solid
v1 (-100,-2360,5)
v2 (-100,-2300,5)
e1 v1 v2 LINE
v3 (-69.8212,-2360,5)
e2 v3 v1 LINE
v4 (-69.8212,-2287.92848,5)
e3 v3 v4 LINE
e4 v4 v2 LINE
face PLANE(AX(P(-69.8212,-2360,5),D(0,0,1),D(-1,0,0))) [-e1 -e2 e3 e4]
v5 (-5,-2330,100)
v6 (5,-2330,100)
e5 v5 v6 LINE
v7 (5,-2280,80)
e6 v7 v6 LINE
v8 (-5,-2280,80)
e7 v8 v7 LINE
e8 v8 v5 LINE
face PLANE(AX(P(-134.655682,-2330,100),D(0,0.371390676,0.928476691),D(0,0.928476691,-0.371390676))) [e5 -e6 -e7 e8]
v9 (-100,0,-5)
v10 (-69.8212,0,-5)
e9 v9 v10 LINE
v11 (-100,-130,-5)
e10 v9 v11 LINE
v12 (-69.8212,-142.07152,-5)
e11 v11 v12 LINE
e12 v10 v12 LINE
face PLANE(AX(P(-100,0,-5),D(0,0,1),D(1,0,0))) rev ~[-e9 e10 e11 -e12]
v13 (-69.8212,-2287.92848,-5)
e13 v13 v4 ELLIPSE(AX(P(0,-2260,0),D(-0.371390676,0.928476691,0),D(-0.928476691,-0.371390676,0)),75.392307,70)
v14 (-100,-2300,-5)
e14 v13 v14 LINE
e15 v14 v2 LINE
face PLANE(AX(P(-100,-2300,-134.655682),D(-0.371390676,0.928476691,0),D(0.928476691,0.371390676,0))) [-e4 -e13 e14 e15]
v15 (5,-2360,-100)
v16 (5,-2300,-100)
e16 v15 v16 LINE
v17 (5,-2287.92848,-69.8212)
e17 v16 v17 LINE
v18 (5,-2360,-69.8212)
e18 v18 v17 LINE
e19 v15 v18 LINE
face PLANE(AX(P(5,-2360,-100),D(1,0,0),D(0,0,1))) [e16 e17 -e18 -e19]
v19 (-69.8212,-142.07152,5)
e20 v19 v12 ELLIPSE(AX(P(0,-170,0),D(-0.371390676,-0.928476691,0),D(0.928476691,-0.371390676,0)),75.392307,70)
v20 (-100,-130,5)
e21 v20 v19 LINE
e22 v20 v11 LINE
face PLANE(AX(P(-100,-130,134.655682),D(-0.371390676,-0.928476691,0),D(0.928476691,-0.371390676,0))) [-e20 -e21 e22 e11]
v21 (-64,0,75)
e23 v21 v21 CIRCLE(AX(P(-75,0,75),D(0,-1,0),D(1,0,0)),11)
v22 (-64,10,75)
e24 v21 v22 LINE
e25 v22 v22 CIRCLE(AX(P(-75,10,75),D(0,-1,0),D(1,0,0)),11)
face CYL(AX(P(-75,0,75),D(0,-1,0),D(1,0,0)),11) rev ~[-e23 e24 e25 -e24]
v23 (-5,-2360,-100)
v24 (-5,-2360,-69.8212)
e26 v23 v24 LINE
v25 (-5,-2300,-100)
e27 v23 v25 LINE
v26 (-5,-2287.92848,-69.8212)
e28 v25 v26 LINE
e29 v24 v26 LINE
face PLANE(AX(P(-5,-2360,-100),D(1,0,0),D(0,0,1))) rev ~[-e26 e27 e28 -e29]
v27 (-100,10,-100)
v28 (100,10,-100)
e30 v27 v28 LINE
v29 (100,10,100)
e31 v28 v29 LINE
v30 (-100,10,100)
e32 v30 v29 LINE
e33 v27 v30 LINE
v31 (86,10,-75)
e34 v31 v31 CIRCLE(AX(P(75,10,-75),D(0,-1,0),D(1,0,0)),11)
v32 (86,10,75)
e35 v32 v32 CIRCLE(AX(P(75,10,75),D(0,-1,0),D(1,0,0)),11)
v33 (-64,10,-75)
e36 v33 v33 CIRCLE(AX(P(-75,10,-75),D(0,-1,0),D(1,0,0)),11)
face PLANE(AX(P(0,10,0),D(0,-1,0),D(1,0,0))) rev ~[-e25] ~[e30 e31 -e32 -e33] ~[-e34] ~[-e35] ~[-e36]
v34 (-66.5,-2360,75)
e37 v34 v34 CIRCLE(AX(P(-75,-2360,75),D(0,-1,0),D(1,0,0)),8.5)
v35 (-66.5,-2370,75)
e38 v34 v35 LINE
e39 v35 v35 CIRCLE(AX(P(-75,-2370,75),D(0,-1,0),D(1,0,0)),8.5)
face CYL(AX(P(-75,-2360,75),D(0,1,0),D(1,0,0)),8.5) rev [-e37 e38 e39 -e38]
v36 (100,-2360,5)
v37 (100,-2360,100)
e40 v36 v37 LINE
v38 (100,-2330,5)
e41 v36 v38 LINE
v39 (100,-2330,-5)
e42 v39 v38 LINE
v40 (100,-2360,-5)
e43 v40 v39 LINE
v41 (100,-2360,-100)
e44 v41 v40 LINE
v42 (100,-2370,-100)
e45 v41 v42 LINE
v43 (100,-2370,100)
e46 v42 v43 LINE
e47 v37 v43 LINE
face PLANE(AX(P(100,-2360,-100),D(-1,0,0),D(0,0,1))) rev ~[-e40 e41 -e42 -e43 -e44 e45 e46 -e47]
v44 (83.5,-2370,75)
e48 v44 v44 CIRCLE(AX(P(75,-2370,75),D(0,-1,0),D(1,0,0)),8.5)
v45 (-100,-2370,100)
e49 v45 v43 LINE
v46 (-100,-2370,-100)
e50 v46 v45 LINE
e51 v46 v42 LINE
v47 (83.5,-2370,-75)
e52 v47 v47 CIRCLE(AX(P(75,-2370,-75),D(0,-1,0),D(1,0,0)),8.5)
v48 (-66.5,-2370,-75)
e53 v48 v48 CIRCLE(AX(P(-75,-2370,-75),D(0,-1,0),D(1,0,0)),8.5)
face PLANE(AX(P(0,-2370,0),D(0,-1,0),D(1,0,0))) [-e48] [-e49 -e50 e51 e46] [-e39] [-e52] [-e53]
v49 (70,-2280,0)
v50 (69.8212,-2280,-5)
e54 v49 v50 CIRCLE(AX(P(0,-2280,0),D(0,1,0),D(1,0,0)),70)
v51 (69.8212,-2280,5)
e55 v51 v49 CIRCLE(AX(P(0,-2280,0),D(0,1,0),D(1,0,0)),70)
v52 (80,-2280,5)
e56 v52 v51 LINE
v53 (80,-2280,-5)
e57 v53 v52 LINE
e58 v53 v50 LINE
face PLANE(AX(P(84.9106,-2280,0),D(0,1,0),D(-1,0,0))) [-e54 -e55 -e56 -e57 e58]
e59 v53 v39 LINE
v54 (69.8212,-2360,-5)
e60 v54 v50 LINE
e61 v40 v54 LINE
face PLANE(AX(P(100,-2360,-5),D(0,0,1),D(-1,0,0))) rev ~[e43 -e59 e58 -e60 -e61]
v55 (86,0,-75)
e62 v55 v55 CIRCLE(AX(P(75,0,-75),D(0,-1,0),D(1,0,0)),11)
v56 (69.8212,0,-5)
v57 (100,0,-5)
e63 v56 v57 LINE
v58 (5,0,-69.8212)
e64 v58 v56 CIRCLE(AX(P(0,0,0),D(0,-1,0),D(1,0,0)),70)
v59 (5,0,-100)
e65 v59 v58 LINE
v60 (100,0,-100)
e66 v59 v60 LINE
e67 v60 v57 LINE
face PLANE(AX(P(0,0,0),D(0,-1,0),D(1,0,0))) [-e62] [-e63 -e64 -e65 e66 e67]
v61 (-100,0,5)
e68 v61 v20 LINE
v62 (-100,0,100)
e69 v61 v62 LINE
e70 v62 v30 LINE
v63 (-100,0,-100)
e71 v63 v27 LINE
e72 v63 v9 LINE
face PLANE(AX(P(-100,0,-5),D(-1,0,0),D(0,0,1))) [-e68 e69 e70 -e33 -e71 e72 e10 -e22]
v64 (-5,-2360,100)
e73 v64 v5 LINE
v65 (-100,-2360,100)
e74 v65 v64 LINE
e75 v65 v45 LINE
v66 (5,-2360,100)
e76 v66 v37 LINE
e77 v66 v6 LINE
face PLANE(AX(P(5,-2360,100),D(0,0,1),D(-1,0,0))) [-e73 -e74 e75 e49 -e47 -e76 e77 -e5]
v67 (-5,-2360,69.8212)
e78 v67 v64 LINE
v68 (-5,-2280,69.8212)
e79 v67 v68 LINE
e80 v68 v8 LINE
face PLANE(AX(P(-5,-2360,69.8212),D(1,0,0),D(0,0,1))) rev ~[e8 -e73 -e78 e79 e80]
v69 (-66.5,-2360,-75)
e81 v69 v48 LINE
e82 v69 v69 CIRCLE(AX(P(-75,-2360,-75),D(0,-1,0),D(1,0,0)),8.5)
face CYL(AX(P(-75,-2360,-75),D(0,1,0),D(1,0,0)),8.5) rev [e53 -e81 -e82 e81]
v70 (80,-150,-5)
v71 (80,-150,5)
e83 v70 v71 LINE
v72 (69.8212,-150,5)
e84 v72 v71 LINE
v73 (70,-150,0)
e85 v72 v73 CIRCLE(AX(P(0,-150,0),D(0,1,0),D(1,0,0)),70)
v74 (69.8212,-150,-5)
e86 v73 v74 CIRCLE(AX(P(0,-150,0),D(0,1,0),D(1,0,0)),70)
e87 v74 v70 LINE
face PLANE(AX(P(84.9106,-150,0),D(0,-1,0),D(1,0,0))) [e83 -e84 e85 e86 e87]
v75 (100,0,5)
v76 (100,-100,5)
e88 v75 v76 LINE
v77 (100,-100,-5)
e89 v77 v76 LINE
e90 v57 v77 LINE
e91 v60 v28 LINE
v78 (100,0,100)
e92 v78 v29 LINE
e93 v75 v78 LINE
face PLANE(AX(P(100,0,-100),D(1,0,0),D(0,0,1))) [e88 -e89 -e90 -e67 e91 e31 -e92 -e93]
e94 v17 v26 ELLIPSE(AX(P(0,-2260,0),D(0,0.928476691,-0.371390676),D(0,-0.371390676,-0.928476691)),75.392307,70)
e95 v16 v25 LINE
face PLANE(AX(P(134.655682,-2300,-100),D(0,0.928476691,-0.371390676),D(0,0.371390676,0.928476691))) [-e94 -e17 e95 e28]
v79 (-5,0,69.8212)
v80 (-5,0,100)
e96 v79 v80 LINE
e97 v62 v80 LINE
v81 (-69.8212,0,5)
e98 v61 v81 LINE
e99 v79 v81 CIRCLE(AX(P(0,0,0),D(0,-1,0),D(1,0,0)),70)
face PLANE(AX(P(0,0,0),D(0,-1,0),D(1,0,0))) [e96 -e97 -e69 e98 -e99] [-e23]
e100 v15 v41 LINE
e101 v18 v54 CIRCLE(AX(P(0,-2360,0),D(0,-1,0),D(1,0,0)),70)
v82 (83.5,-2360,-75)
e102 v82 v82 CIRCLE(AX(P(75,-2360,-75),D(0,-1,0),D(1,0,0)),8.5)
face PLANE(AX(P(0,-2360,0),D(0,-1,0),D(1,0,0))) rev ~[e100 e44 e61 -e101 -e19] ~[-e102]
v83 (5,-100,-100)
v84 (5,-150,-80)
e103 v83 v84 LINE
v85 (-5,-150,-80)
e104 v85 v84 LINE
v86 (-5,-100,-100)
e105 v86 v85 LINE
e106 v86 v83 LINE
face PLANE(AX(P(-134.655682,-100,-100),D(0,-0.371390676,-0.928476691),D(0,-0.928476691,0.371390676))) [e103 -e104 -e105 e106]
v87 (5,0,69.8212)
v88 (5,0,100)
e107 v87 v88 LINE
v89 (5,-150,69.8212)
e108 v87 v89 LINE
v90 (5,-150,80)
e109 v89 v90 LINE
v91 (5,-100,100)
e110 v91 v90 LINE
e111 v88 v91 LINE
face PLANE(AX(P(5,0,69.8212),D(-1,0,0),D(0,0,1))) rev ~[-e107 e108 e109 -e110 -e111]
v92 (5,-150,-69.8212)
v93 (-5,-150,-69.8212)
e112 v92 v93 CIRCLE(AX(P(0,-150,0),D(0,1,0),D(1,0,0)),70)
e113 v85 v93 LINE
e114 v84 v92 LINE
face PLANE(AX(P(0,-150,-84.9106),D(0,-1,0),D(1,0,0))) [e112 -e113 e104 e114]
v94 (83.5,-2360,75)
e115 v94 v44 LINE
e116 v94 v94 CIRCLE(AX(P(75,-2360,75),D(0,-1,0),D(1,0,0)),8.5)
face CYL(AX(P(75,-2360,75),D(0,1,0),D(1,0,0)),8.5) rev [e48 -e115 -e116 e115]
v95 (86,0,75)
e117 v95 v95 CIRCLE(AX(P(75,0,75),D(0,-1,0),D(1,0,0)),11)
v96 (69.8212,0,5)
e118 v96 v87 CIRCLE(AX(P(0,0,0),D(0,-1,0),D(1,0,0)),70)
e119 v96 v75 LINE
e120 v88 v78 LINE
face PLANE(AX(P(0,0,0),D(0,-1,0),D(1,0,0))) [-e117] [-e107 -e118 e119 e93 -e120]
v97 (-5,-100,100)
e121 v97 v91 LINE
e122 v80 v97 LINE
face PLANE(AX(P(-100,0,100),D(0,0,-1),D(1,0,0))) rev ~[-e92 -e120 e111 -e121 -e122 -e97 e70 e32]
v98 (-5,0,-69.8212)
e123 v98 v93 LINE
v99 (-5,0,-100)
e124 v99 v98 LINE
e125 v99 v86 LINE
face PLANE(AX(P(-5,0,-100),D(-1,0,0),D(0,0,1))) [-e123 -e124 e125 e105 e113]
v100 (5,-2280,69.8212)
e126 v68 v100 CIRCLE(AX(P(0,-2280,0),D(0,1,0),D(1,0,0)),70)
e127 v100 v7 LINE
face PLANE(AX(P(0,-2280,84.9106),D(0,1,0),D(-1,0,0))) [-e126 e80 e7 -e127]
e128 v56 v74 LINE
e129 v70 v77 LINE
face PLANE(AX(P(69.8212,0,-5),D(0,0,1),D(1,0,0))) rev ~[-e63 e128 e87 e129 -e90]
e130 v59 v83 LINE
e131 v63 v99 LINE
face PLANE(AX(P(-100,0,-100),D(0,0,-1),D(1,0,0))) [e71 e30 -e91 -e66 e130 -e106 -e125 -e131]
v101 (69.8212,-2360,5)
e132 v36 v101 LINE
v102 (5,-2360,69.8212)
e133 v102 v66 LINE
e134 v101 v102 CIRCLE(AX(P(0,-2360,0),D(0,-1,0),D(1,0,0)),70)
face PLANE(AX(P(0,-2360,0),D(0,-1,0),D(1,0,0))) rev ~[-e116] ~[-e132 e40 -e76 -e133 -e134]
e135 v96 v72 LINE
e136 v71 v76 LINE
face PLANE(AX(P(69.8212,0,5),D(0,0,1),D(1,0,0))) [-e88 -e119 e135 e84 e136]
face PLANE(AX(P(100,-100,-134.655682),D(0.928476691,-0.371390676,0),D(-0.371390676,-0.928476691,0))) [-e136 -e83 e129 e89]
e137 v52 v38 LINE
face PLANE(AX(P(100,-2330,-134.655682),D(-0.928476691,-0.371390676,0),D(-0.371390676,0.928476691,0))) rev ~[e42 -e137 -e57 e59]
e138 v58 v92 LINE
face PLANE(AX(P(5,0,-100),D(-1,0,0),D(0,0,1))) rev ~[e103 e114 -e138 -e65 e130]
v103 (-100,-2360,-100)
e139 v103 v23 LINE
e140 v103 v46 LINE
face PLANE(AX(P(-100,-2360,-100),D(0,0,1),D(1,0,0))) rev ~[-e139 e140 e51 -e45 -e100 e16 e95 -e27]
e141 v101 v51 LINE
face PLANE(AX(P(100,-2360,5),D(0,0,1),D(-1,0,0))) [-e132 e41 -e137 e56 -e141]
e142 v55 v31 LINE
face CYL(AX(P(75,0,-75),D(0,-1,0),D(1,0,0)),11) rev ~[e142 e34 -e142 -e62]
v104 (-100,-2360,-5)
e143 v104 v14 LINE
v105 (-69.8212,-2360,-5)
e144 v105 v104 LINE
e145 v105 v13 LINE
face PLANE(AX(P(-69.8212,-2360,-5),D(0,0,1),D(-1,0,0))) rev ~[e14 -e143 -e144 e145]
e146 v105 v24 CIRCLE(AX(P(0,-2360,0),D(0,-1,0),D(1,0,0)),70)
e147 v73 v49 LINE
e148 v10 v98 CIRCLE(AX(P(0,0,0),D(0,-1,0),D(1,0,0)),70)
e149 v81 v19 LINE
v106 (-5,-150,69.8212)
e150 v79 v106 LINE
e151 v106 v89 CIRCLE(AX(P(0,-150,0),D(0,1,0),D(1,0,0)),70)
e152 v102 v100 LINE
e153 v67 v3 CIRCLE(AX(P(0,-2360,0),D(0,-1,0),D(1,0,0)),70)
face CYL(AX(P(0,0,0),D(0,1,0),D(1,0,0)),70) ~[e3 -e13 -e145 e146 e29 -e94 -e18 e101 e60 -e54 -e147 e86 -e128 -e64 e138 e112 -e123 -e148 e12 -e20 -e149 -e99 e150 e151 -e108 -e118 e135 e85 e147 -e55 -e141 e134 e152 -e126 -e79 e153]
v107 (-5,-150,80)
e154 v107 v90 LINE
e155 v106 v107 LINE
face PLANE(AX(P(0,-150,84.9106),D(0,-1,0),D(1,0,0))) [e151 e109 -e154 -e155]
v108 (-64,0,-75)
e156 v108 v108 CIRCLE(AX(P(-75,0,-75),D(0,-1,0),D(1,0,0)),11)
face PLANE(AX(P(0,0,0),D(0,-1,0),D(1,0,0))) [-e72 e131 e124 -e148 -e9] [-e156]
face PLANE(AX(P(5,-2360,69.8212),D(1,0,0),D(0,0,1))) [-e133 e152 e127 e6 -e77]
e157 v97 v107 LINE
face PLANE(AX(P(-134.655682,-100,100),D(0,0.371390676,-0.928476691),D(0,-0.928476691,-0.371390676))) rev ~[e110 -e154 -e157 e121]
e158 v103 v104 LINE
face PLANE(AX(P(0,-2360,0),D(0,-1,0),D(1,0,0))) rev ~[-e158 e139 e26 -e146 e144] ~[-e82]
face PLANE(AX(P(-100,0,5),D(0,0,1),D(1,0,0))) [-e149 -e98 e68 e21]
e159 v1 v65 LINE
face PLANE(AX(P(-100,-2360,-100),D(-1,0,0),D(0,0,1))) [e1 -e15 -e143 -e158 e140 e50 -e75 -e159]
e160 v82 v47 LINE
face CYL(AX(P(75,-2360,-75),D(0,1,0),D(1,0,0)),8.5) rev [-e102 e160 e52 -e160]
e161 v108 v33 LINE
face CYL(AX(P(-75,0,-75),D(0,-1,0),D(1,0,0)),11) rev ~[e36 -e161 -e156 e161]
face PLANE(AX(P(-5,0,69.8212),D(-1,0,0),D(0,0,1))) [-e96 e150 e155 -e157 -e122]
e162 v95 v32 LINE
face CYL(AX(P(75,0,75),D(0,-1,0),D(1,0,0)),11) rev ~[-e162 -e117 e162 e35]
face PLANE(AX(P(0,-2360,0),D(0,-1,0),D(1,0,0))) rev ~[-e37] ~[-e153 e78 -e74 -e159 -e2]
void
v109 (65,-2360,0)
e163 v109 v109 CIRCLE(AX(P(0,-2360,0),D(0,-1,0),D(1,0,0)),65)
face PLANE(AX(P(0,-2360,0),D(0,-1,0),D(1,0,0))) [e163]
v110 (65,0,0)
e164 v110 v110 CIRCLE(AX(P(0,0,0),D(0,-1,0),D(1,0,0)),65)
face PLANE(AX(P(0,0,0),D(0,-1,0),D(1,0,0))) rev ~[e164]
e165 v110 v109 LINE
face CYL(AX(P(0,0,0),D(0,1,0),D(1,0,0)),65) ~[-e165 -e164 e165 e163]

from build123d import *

# Parameters (mm, degrees)
F0_R          = 70
F0_R_2        = 65
F1_DEPTH      = 2360
F2_W          = 200
F2_H          = 200
F2_R          = 11
F3_DEPTH      = 10
F4_W          = 30.1787997812
F4_H          = 10
F4_W_2        = 10
F4_H_2        = 30.1787997812
F5_DEPTH      = 150
F6_T1_DEPTH   = 269.311363913
F6_T3_DEPTH   = 269.311363913
F6_T8_DEPTH   = 269.311363913
F6_S9_R       = 70
F6_T10_DEPTH  = 139
F8_W          = 200
F8_H          = 200
F8_R          = 8.5
F9_DEPTH      = 10
F10_W         = 10
F10_H         = 30.1787997812
F10_W_2       = 30.1787997812
F10_H_2       = 10
F11_DEPTH     = 80
F12_T1_DEPTH  = 269.311363913
F12_T3_DEPTH  = 269.311363913
F12_T8_DEPTH  = 269.311363913
F12_S9_R      = 70
F12_T10_DEPTH = 139
F12_T14_DEPTH = 269.311363913
F12_S15_R     = 70
F12_T16_DEPTH = 139


# Not quite as in the source:
# - a fillet or chamfer that OpenCascade refuses, or shapes differently, is made with other operations: its cross-section is extruded or revolved along the edge and cut away or added


with BuildPart() as f1:
    # F0 (on Front) → F1 (new body)
    with BuildSketch(Plane.XZ):
        Circle(F0_R)
        Circle(F0_R_2, mode=Mode.SUBTRACT)
    extrude(amount=F1_DEPTH)

    # F2 (on Front) → F3 (join)
    with BuildSketch(Plane.XZ):
        Rectangle(F2_W, F2_H)
        with Locations((-75, -75)):
            Circle(F2_R, mode=Mode.SUBTRACT)
        with Locations((75, -75)):
            Circle(F2_R, mode=Mode.SUBTRACT)
        with Locations((-75, 75)):
            Circle(F2_R, mode=Mode.SUBTRACT)
        with Locations((75, 75)):
            Circle(F2_R, mode=Mode.SUBTRACT)
    extrude(amount=-F3_DEPTH)

    # F4 (on Front) → F5 (join)
    with BuildSketch(Plane.XZ):
        with Locations((-84.9106001094, 0)):
            Rectangle(F4_W, F4_H)
        with Locations((0, 84.9106001094)):
            Rectangle(F4_W_2, F4_H_2)
        with Locations((84.9106001094, 0)):
            Rectangle(F4_W, F4_H)
        with Locations((0, -84.9106001094)):
            Rectangle(F4_W_2, F4_H_2)
    extrude(amount=F5_DEPTH)

    # F6: chamfer of 50 x 20 on 4 edges, made by hand

    # F6_s2 → F6_t1 (cut)
    with BuildSketch(Plane.YZ.offset(-134.6556819565)):
        Polygon((-100, 100), (-150, 80), (-150, 100), align=None)
        Polygon((-100, -100), (-150, -80), (-150, -100), align=None)
    extrude(amount=F6_T1_DEPTH, mode=Mode.SUBTRACT)

    # F6_s4 → F6_t3 (cut)
    with BuildSketch(Plane.XY.offset(-134.6556819565)):
        Polygon((100, -100), (80, -150), (100, -150), align=None)
    extrude(amount=F6_T3_DEPTH, mode=Mode.SUBTRACT)


with BuildPart() as f6_tool6:
    # F6_s7 → F6_t8 (new body)
    with BuildSketch(Plane.XY.offset(134.6556819565)):
        Polygon((-100, -130), (-50, -150), (-100, -150), align=None)
    extrude(amount=-F6_T8_DEPTH)

    # F6_s9 → F6_t10 (cut, symmetric)
    with BuildSketch(Plane.XZ.offset(140)):
        Circle(F6_S9_R)
    extrude(amount=F6_T10_DEPTH, both=True, mode=Mode.SUBTRACT)


with BuildPart() as f1_1:
    add(f1.part)

    # F6_t5: cut F6_tool6
    add(f6_tool6.part, mode=Mode.SUBTRACT)

    # F8 (on offset) → F9 (join)
    with BuildSketch(Plane.XZ.offset(2360)):
        Rectangle(F8_W, F8_H)
        with Locations((-75, -75)):
            Circle(F8_R, mode=Mode.SUBTRACT)
        with Locations((75, -75)):
            Circle(F8_R, mode=Mode.SUBTRACT)
        with Locations((-75, 75)):
            Circle(F8_R, mode=Mode.SUBTRACT)
        with Locations((75, 75)):
            Circle(F8_R, mode=Mode.SUBTRACT)
    extrude(amount=F9_DEPTH)

    # F10 (on face) → F11 (join)
    with BuildSketch(Plane(origin=(0, -2360, 0), x_dir=(-1, 0, 0), z_dir=(0, 1, 0))):
        with Locations((0, 84.9106001094)):
            Rectangle(F10_W, F10_H)
        with Locations((84.9106001094, 0)):
            Rectangle(F10_W_2, F10_H_2)
        with Locations((0, -84.9106001094)):
            Rectangle(F10_W, F10_H)
        with Locations((-84.9106001094, 0)):
            Rectangle(F10_W_2, F10_H_2)
    extrude(amount=F11_DEPTH)

    # F12: chamfer of 20 x 50 on 4 edges, made by hand

    # F12_s2 → F12_t1 (cut)
    with BuildSketch(Plane.YZ.offset(-134.6556819565)):
        Polygon((-2330, 100), (-2280, 80), (-2280, 100), align=None)
    extrude(amount=F12_T1_DEPTH, mode=Mode.SUBTRACT)

    # F12_s4 → F12_t3 (cut)
    with BuildSketch(Plane.XY.offset(-134.6556819565)):
        Polygon((100, -2330), (80, -2280), (100, -2280), align=None)
    extrude(amount=F12_T3_DEPTH, mode=Mode.SUBTRACT)


with BuildPart() as f12_tool6:
    # F12_s7 → F12_t8 (new body)
    with BuildSketch(Plane.XY.offset(-134.6556819565)):
        Polygon((-100, -2300), (-50, -2280), (-100, -2280), align=None)
    extrude(amount=F12_T8_DEPTH)

    # F12_s9 → F12_t10 (cut, symmetric)
    with BuildSketch(Plane.XZ.offset(2290)):
        Circle(F12_S9_R)
    extrude(amount=F12_T10_DEPTH, both=True, mode=Mode.SUBTRACT)


with BuildPart() as f1_2:
    add(f1_1.part)

    # F12_t5: cut F12_tool6
    add(f12_tool6.part, mode=Mode.SUBTRACT)


with BuildPart() as f12_tool12:
    # F12_s13 → F12_t14 (new body)
    with BuildSketch(Plane.YZ.offset(134.6556819565)):
        Polygon((-2300, -100), (-2280, -50), (-2280, -100), align=None)
    extrude(amount=-F12_T14_DEPTH)

    # F12_s15 → F12_t16 (cut, symmetric)
    with BuildSketch(Plane.XZ.offset(2290)):
        Circle(F12_S15_R)
    extrude(amount=F12_T16_DEPTH, both=True, mode=Mode.SUBTRACT)


with BuildPart() as f1_3:
    add(f1_2.part)

    # F12_t11: cut F12_tool12
    add(f12_tool12.part, mode=Mode.SUBTRACT)


solid = f1_3.part
